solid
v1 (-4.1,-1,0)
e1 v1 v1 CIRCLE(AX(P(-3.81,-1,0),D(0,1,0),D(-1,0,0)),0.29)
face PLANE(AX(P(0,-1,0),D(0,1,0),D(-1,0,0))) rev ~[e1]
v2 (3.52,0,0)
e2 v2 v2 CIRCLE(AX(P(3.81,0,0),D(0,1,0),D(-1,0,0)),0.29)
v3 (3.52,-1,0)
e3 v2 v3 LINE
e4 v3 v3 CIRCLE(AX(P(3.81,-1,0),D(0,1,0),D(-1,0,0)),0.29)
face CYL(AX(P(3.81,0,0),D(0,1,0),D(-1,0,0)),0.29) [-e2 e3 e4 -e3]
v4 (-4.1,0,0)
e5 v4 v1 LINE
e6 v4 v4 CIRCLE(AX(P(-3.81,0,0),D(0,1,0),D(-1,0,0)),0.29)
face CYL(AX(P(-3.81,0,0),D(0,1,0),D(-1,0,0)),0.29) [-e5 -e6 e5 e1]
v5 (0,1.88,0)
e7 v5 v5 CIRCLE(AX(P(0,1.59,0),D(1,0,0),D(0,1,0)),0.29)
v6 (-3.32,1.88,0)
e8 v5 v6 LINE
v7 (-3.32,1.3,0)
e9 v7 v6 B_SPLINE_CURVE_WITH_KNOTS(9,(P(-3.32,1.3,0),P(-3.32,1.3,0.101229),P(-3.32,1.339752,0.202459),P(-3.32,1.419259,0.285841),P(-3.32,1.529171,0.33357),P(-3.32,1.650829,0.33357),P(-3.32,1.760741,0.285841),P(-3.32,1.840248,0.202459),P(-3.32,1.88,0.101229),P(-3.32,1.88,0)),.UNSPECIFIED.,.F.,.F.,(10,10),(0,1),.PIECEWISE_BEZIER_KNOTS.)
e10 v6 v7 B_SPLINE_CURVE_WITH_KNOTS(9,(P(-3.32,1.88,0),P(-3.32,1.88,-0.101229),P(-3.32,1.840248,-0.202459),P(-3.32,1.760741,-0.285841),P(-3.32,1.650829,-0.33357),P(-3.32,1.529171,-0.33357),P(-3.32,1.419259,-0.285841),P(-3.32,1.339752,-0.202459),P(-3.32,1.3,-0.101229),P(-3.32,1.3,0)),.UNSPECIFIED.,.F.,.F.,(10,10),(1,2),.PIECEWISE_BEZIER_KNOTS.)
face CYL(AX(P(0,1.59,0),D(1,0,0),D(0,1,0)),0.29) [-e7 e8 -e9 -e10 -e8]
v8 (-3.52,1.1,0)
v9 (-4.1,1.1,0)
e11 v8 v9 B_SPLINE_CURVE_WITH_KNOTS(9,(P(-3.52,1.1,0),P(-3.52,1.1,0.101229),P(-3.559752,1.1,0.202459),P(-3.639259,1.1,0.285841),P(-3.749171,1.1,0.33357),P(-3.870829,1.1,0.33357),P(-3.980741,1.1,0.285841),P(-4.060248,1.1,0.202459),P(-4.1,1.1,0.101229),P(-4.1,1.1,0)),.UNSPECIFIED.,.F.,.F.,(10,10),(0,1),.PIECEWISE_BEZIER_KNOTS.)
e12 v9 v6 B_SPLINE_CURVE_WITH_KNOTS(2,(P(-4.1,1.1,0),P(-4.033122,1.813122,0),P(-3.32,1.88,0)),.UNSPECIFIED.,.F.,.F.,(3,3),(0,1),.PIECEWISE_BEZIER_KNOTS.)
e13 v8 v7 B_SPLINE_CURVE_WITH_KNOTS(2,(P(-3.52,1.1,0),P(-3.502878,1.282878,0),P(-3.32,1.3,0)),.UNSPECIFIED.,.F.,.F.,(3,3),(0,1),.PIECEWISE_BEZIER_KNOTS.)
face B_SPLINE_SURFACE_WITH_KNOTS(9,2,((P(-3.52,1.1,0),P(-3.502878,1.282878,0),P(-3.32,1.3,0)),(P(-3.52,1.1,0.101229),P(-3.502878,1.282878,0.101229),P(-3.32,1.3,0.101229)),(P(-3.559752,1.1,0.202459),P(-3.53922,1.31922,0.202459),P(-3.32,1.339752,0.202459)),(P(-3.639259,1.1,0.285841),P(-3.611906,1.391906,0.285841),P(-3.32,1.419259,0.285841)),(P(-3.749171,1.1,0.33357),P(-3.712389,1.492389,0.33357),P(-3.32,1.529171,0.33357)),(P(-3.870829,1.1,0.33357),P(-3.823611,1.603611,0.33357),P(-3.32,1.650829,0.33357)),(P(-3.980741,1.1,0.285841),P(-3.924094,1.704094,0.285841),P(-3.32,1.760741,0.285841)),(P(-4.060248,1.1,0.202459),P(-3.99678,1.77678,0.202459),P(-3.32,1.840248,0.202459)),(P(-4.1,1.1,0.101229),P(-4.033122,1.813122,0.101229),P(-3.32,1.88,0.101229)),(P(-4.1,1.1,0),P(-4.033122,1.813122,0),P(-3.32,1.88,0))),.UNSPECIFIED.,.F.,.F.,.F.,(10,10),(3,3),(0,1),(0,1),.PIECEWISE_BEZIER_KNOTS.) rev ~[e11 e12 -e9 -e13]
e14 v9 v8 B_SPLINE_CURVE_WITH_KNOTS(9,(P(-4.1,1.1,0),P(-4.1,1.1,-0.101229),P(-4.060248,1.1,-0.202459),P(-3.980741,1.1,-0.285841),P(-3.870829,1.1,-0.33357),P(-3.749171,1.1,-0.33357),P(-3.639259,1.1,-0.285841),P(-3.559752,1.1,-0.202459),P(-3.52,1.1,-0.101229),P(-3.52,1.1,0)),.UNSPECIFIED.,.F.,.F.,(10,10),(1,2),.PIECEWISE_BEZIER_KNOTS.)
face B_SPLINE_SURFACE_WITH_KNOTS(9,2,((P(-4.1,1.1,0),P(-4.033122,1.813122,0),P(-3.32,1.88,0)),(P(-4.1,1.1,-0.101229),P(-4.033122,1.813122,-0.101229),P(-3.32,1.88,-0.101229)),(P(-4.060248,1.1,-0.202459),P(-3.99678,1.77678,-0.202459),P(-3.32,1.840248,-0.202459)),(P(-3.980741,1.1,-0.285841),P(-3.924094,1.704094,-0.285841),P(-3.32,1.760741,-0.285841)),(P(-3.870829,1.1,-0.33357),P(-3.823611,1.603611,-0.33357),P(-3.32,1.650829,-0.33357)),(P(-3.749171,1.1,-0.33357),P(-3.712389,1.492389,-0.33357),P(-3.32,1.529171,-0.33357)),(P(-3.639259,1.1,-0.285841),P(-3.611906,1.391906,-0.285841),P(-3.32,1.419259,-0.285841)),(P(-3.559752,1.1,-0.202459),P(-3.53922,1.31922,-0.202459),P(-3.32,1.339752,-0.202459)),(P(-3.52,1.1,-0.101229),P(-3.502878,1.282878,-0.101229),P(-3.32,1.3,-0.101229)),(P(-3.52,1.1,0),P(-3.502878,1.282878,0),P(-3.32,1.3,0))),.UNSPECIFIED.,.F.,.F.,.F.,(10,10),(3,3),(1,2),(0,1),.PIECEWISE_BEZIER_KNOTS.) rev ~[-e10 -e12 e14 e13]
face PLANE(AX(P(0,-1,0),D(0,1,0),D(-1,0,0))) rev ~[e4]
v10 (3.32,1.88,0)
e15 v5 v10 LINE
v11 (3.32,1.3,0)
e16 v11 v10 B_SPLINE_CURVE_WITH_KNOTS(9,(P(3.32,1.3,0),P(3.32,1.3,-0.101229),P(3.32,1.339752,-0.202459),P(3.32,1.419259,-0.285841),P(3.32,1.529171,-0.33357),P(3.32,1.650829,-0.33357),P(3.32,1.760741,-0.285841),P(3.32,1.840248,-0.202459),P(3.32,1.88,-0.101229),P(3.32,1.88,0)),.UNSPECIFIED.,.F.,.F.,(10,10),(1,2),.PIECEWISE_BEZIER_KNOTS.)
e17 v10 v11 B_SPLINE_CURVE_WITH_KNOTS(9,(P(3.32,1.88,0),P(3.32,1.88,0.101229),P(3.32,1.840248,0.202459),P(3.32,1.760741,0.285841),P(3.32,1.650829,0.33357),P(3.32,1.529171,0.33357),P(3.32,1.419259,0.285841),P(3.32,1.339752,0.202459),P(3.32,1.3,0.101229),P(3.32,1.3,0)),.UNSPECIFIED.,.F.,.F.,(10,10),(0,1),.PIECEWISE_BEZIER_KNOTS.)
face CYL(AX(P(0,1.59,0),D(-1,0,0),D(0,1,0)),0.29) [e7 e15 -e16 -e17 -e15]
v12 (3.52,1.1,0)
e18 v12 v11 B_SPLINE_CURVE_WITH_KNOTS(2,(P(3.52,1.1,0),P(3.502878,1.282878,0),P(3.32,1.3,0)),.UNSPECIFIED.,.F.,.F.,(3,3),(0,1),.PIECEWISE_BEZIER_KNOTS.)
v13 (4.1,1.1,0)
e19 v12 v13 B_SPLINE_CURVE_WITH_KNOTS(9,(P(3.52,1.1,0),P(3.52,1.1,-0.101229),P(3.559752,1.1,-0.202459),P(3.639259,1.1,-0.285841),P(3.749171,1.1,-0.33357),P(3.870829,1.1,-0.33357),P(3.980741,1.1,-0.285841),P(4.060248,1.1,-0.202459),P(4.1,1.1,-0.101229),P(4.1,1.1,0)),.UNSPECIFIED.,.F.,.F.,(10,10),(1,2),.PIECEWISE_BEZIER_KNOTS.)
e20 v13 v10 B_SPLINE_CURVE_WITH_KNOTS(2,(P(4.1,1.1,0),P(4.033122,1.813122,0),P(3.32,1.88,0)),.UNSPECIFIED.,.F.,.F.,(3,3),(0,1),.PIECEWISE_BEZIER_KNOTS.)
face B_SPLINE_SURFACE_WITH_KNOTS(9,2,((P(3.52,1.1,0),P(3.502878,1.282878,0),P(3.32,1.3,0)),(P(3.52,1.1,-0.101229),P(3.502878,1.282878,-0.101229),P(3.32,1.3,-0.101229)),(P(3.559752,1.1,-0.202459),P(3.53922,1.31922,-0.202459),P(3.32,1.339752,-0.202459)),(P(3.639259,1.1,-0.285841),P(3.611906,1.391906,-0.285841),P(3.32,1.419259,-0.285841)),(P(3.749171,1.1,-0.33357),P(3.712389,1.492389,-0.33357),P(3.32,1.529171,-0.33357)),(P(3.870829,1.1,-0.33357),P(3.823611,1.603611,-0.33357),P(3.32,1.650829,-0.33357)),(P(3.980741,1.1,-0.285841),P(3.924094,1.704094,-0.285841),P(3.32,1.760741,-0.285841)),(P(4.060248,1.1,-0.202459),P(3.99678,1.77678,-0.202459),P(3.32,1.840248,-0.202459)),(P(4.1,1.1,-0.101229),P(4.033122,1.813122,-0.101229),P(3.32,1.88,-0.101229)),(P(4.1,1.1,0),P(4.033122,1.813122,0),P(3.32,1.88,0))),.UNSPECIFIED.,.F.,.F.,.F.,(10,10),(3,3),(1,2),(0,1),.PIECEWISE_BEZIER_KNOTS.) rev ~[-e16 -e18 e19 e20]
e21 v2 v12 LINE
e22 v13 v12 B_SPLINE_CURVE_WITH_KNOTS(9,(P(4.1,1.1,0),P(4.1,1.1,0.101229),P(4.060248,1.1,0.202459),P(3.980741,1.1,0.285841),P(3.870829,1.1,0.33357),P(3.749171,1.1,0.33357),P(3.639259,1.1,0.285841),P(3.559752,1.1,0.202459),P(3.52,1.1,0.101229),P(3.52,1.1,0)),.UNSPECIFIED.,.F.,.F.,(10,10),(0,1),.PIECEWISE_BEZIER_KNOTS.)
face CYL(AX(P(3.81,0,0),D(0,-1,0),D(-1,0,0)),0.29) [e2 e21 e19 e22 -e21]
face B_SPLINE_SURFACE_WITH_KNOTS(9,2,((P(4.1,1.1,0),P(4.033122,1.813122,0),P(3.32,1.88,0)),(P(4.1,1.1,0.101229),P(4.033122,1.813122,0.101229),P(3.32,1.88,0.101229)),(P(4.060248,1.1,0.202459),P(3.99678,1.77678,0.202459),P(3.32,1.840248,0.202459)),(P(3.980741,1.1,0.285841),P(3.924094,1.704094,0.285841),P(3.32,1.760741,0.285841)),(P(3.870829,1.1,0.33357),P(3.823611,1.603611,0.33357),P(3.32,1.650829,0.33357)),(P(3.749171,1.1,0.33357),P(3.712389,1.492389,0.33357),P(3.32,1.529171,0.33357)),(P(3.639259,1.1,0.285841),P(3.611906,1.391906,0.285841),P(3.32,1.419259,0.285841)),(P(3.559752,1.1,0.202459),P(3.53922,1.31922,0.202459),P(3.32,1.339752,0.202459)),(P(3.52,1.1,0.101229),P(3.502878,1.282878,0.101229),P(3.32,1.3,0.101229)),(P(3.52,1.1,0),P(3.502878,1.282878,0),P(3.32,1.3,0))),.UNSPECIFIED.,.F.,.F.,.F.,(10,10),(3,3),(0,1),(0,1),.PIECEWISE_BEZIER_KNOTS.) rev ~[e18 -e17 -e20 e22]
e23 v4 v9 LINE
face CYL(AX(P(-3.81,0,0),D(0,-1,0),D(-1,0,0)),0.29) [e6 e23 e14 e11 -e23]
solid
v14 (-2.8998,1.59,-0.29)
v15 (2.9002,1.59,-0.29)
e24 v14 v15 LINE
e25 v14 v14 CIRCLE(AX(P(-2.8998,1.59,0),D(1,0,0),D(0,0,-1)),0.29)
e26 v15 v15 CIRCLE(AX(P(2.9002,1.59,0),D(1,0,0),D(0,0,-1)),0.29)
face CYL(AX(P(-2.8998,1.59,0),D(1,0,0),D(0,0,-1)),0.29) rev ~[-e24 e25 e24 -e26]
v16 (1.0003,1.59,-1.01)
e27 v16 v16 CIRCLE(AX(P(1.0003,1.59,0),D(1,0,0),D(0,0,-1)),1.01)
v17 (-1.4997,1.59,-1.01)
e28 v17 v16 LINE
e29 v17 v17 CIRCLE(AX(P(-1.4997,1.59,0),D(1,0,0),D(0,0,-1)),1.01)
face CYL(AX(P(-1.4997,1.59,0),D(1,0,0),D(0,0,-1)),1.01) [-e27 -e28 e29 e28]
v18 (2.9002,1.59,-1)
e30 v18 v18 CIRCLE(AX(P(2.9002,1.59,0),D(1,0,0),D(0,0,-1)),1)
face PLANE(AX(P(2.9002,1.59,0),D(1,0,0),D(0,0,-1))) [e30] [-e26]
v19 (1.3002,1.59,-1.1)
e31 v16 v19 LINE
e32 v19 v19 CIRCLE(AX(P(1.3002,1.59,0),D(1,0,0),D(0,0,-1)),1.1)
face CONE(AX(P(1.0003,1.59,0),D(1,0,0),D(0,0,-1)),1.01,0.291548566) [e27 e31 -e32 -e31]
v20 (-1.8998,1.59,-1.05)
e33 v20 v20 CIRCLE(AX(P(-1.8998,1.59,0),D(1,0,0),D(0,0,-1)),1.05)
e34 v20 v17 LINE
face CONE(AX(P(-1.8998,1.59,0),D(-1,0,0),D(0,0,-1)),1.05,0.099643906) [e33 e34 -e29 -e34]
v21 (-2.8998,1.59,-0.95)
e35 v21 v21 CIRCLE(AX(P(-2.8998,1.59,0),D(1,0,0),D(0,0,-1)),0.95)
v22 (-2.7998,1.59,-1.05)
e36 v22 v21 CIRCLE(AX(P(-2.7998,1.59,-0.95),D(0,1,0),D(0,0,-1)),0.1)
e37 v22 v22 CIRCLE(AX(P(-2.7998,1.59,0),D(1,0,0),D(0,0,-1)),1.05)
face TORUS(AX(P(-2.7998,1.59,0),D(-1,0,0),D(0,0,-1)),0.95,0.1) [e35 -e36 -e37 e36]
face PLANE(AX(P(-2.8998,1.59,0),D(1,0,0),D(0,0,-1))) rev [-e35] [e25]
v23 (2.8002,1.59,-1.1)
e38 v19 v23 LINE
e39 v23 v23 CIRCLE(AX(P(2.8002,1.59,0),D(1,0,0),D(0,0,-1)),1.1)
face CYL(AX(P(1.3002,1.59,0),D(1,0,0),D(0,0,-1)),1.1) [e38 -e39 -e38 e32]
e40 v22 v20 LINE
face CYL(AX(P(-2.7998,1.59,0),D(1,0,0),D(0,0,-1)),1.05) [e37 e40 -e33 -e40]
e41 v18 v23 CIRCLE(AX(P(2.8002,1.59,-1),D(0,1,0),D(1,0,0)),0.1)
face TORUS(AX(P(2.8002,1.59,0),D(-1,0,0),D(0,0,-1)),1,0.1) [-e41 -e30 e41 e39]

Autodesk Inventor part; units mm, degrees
sketch "Sketch4" plane through (0, 0, 0) normal (0, 1, 0) x (-1, 0, 0)
  circle A0 centre (3.81, 0) radius 0.29
  circle A1 centre (-3.81, 0) radius 0.29
  point P0 (0, 0)
  dimension "d24" = 3.81
  dimension "d25" = 3.81
  dimension "d26" = 0.58
  dimension "d27" = 0.58
extrude "Extrusion2" add sketch "Sketch4" along normal blind 1.1 and the other way blind 1
sketch "Cable-Outline" plane through (0, 0, 0) normal (0, 0, 1) x (1, 0, 0)
  arc A0 (-3.32, 1.88) -> (-4.1, 1.1) centre (-3.32, 1.1) ccw construction
  line L0 (-3.52, 1.1) -> (-4.1, 1.1) construction
  arc A1 (-3.32, 1.3) -> (-3.52, 1.1) centre (-3.32, 1.1) ccw construction
  line L1 (4.1, 1.1) -> (3.52, 1.1) construction
  arc A2 (3.52, 1.1) -> (3.32, 1.3) centre (3.32, 1.1) ccw construction
  arc A3 (4.1, 1.1) -> (3.32, 1.88) centre (3.32, 1.1) ccw construction
  line L2 (3.32, 1.1) -> (3.32, 1.88) construction
  line L3 (3.32, 1.1) -> (4.1, 1.1) construction
  line L4 (-3.32, 1.88) -> (3.32, 1.88) construction
  line L5 (-3.32, 1.3) -> (3.32, 1.3) construction
  line L6 (-3.4614, 1.2414) -> (-3.8715, 1.6515) construction
  line L7 (3.8715, 1.6515) -> (3.4614, 1.2414) construction
  line L8 (-3.6665, 1.4465) -> (-3.8476, 1.2654) construction
  line L9 (3.6665, 1.4465) -> (3.813, 1.3) construction
  point P0 (0, 0)
  point P1 (0, 1.88)
  point P2 (0, 1.3)
  dimension "d33" = 0.2
  dimension "d36" = 90
  dimension "d37" = 90
  dimension "d38" = 0.58
  dimension "d39" = 90
  dimension "d40" = 90
  dimension "d41" = 0.2
  dimension "d42" = 0.58
  dimension "d43" = 3.32
  dimension "d46" = 90
  dimension "d47" = 90
sketch "Cable-Center" plane through (0, 0, 0) normal (1, 0, 0) x (0, 1, 0)
  line L0 (1.3, 0) -> (1.88, 0) construction
  circle A0 centre (1.59, 0) radius 0.29
  point P0 (0, 0)
  dimension "d82" = 0.58
extrude "Extrusion3" add sketch "Cable-Center" along normal mid plane 6.64
ref_plane "Cable-Plane-A" through (-3.6665, 1.4465, 0) normal (-0.7071068, -0.7071068, 0) x (0.7071068, -0.7071068, 0)
sketch "Cable-Sketch-A" plane through (-3.6665, 1.4465, 0) normal (-0.7071068, -0.7071068, 0) x (0.7071068, -0.7071068, 0)
  circle A0 centre (0, 0) radius 0.29
  point P0 (3.6154, 0)
  dimension "d50" = 0.58
ref_plane "Cable-Plane-B" through (3.6665, 1.4465, 0) normal (0.7071068, -0.7071068, 0) x (0.7071068, 0.7071068, 0)
sketch "Cable-Sketch-B" plane through (3.6665, 1.4465, 0) normal (0.7071068, -0.7071068, 0) x (0.7071068, 0.7071068, 0)
  circle A0 centre (0, 0) radius 0.29
  point P0 (-3.6154, 0)
  point P1 (0.29, 0)
  dimension "d81" = 0.58
loft "Loft4" add profiles "Cable-Sketch-B" section 1 edges at (4.1, 1.1, 0) section 3 edges at (3.32, 1.3, 0)
loft "Loft5" add profiles "Cable-Sketch-A" section 1 edges at (-3.52, 1.1, 0) section 3 edges at (-3.32, 1.3, 0)
ref_plane "Coat-Plane" through (0, 1.59, 0) normal (0, 1, 0) x (-1, 0, 0)
sketch "Coat-Cut" plane through (0, 1.59, 0) normal (0, 1, 0) x (-1, 0, 0)
  line L0 (3.32, -0.29) -> (-3.32, -0.29) projected
  line L1 (2.9, 0.29) -> (-2.9, 0.29)
  line L2 (-2.9, 0.29) -> (-2.9, -0.29)
  line L3 (-2.9, -0.29) -> (2.9, -0.29)
  line L4 (2.9, -0.29) -> (2.9, 0.29)
  line L5 (2.9, 0.29) -> (-2.9, -0.29) construction
  line L6 (-2.9, 0.29) -> (2.9, -0.29) construction
  point P0 (0, 0)
  dimension "d63" = 5.8
sketch "Sketch11" plane through (0, 1.59, 0) normal (0, 1, 0) x (-1, 0, 0)
  circle A0 centre (3.81, 0) radius 0.29 projected
  line L0 (4.1, 0) -> (-4.1, 0)
  circle A1 centre (-3.81, 0) radius 0.29 projected
  line L1 (2.8998, -0.29) -> (2.8998, -0.95)
  line L2 (-1.0003, -1.01) -> (-1.3002, -1.1)
  line L3 (-1.3002, -1.1) -> (-2.8002, -1.1)
  line L4 (-2.9002, -1) -> (-2.9002, -0.29)
  arc A2 (-2.9002, -1) -> (-2.8002, -1.1) centre (-2.8002, -1) ccw
  line L5 (2.8998, -0.29) -> (-2.9002, -0.29)
  line L6 (3.32, -0.29) -> (-3.32, -0.29) projected
  line L7 (2.7998, -1.05) -> (1.8998, -1.05)
  line L8 (1.8998, -1.05) -> (1.4997, -1.01)
  line L9 (1.4997, -1.01) -> (-1.0003, -1.01)
  arc A3 (2.7998, -1.05) -> (2.8998, -0.95) centre (2.7998, -0.95) ccw
  point P0 (0, 0)
  point P1 (0, 0)
  point P2 (-2.9002, -1.1)
  point P3 (2.8998, -1.05)
  point P4 (-0.0002, -0.29)
  dimension "d67" = 0.81
  dimension "d68" = 1.6
  dimension "d69" = 0.1
  dimension "d72" = 0.76
  dimension "d73" = 1
  dimension "d74" = 2.5
  dimension "d75" = 0.1
  dimension "d76" = 0.72
  dimension "d83" = 0.29
revolve "Coat-Body" add sketch "Sketch11" angle 360 about axis through (-4.1, 1.59, 0) along (1, 0, 0) separate body contours L1 A3 L7 L8 L9 L2 L3 A2 L4 L5
equation "\"d27\" = d26"
equation "\"d82\" = d26"
equation "\"d44\" = 2 * d43"
equation "\"d50\" = d26"
equation "\"d81\" = d26"
equation "\"d83\" = 0.5 * d26"
properties part number "Res"
